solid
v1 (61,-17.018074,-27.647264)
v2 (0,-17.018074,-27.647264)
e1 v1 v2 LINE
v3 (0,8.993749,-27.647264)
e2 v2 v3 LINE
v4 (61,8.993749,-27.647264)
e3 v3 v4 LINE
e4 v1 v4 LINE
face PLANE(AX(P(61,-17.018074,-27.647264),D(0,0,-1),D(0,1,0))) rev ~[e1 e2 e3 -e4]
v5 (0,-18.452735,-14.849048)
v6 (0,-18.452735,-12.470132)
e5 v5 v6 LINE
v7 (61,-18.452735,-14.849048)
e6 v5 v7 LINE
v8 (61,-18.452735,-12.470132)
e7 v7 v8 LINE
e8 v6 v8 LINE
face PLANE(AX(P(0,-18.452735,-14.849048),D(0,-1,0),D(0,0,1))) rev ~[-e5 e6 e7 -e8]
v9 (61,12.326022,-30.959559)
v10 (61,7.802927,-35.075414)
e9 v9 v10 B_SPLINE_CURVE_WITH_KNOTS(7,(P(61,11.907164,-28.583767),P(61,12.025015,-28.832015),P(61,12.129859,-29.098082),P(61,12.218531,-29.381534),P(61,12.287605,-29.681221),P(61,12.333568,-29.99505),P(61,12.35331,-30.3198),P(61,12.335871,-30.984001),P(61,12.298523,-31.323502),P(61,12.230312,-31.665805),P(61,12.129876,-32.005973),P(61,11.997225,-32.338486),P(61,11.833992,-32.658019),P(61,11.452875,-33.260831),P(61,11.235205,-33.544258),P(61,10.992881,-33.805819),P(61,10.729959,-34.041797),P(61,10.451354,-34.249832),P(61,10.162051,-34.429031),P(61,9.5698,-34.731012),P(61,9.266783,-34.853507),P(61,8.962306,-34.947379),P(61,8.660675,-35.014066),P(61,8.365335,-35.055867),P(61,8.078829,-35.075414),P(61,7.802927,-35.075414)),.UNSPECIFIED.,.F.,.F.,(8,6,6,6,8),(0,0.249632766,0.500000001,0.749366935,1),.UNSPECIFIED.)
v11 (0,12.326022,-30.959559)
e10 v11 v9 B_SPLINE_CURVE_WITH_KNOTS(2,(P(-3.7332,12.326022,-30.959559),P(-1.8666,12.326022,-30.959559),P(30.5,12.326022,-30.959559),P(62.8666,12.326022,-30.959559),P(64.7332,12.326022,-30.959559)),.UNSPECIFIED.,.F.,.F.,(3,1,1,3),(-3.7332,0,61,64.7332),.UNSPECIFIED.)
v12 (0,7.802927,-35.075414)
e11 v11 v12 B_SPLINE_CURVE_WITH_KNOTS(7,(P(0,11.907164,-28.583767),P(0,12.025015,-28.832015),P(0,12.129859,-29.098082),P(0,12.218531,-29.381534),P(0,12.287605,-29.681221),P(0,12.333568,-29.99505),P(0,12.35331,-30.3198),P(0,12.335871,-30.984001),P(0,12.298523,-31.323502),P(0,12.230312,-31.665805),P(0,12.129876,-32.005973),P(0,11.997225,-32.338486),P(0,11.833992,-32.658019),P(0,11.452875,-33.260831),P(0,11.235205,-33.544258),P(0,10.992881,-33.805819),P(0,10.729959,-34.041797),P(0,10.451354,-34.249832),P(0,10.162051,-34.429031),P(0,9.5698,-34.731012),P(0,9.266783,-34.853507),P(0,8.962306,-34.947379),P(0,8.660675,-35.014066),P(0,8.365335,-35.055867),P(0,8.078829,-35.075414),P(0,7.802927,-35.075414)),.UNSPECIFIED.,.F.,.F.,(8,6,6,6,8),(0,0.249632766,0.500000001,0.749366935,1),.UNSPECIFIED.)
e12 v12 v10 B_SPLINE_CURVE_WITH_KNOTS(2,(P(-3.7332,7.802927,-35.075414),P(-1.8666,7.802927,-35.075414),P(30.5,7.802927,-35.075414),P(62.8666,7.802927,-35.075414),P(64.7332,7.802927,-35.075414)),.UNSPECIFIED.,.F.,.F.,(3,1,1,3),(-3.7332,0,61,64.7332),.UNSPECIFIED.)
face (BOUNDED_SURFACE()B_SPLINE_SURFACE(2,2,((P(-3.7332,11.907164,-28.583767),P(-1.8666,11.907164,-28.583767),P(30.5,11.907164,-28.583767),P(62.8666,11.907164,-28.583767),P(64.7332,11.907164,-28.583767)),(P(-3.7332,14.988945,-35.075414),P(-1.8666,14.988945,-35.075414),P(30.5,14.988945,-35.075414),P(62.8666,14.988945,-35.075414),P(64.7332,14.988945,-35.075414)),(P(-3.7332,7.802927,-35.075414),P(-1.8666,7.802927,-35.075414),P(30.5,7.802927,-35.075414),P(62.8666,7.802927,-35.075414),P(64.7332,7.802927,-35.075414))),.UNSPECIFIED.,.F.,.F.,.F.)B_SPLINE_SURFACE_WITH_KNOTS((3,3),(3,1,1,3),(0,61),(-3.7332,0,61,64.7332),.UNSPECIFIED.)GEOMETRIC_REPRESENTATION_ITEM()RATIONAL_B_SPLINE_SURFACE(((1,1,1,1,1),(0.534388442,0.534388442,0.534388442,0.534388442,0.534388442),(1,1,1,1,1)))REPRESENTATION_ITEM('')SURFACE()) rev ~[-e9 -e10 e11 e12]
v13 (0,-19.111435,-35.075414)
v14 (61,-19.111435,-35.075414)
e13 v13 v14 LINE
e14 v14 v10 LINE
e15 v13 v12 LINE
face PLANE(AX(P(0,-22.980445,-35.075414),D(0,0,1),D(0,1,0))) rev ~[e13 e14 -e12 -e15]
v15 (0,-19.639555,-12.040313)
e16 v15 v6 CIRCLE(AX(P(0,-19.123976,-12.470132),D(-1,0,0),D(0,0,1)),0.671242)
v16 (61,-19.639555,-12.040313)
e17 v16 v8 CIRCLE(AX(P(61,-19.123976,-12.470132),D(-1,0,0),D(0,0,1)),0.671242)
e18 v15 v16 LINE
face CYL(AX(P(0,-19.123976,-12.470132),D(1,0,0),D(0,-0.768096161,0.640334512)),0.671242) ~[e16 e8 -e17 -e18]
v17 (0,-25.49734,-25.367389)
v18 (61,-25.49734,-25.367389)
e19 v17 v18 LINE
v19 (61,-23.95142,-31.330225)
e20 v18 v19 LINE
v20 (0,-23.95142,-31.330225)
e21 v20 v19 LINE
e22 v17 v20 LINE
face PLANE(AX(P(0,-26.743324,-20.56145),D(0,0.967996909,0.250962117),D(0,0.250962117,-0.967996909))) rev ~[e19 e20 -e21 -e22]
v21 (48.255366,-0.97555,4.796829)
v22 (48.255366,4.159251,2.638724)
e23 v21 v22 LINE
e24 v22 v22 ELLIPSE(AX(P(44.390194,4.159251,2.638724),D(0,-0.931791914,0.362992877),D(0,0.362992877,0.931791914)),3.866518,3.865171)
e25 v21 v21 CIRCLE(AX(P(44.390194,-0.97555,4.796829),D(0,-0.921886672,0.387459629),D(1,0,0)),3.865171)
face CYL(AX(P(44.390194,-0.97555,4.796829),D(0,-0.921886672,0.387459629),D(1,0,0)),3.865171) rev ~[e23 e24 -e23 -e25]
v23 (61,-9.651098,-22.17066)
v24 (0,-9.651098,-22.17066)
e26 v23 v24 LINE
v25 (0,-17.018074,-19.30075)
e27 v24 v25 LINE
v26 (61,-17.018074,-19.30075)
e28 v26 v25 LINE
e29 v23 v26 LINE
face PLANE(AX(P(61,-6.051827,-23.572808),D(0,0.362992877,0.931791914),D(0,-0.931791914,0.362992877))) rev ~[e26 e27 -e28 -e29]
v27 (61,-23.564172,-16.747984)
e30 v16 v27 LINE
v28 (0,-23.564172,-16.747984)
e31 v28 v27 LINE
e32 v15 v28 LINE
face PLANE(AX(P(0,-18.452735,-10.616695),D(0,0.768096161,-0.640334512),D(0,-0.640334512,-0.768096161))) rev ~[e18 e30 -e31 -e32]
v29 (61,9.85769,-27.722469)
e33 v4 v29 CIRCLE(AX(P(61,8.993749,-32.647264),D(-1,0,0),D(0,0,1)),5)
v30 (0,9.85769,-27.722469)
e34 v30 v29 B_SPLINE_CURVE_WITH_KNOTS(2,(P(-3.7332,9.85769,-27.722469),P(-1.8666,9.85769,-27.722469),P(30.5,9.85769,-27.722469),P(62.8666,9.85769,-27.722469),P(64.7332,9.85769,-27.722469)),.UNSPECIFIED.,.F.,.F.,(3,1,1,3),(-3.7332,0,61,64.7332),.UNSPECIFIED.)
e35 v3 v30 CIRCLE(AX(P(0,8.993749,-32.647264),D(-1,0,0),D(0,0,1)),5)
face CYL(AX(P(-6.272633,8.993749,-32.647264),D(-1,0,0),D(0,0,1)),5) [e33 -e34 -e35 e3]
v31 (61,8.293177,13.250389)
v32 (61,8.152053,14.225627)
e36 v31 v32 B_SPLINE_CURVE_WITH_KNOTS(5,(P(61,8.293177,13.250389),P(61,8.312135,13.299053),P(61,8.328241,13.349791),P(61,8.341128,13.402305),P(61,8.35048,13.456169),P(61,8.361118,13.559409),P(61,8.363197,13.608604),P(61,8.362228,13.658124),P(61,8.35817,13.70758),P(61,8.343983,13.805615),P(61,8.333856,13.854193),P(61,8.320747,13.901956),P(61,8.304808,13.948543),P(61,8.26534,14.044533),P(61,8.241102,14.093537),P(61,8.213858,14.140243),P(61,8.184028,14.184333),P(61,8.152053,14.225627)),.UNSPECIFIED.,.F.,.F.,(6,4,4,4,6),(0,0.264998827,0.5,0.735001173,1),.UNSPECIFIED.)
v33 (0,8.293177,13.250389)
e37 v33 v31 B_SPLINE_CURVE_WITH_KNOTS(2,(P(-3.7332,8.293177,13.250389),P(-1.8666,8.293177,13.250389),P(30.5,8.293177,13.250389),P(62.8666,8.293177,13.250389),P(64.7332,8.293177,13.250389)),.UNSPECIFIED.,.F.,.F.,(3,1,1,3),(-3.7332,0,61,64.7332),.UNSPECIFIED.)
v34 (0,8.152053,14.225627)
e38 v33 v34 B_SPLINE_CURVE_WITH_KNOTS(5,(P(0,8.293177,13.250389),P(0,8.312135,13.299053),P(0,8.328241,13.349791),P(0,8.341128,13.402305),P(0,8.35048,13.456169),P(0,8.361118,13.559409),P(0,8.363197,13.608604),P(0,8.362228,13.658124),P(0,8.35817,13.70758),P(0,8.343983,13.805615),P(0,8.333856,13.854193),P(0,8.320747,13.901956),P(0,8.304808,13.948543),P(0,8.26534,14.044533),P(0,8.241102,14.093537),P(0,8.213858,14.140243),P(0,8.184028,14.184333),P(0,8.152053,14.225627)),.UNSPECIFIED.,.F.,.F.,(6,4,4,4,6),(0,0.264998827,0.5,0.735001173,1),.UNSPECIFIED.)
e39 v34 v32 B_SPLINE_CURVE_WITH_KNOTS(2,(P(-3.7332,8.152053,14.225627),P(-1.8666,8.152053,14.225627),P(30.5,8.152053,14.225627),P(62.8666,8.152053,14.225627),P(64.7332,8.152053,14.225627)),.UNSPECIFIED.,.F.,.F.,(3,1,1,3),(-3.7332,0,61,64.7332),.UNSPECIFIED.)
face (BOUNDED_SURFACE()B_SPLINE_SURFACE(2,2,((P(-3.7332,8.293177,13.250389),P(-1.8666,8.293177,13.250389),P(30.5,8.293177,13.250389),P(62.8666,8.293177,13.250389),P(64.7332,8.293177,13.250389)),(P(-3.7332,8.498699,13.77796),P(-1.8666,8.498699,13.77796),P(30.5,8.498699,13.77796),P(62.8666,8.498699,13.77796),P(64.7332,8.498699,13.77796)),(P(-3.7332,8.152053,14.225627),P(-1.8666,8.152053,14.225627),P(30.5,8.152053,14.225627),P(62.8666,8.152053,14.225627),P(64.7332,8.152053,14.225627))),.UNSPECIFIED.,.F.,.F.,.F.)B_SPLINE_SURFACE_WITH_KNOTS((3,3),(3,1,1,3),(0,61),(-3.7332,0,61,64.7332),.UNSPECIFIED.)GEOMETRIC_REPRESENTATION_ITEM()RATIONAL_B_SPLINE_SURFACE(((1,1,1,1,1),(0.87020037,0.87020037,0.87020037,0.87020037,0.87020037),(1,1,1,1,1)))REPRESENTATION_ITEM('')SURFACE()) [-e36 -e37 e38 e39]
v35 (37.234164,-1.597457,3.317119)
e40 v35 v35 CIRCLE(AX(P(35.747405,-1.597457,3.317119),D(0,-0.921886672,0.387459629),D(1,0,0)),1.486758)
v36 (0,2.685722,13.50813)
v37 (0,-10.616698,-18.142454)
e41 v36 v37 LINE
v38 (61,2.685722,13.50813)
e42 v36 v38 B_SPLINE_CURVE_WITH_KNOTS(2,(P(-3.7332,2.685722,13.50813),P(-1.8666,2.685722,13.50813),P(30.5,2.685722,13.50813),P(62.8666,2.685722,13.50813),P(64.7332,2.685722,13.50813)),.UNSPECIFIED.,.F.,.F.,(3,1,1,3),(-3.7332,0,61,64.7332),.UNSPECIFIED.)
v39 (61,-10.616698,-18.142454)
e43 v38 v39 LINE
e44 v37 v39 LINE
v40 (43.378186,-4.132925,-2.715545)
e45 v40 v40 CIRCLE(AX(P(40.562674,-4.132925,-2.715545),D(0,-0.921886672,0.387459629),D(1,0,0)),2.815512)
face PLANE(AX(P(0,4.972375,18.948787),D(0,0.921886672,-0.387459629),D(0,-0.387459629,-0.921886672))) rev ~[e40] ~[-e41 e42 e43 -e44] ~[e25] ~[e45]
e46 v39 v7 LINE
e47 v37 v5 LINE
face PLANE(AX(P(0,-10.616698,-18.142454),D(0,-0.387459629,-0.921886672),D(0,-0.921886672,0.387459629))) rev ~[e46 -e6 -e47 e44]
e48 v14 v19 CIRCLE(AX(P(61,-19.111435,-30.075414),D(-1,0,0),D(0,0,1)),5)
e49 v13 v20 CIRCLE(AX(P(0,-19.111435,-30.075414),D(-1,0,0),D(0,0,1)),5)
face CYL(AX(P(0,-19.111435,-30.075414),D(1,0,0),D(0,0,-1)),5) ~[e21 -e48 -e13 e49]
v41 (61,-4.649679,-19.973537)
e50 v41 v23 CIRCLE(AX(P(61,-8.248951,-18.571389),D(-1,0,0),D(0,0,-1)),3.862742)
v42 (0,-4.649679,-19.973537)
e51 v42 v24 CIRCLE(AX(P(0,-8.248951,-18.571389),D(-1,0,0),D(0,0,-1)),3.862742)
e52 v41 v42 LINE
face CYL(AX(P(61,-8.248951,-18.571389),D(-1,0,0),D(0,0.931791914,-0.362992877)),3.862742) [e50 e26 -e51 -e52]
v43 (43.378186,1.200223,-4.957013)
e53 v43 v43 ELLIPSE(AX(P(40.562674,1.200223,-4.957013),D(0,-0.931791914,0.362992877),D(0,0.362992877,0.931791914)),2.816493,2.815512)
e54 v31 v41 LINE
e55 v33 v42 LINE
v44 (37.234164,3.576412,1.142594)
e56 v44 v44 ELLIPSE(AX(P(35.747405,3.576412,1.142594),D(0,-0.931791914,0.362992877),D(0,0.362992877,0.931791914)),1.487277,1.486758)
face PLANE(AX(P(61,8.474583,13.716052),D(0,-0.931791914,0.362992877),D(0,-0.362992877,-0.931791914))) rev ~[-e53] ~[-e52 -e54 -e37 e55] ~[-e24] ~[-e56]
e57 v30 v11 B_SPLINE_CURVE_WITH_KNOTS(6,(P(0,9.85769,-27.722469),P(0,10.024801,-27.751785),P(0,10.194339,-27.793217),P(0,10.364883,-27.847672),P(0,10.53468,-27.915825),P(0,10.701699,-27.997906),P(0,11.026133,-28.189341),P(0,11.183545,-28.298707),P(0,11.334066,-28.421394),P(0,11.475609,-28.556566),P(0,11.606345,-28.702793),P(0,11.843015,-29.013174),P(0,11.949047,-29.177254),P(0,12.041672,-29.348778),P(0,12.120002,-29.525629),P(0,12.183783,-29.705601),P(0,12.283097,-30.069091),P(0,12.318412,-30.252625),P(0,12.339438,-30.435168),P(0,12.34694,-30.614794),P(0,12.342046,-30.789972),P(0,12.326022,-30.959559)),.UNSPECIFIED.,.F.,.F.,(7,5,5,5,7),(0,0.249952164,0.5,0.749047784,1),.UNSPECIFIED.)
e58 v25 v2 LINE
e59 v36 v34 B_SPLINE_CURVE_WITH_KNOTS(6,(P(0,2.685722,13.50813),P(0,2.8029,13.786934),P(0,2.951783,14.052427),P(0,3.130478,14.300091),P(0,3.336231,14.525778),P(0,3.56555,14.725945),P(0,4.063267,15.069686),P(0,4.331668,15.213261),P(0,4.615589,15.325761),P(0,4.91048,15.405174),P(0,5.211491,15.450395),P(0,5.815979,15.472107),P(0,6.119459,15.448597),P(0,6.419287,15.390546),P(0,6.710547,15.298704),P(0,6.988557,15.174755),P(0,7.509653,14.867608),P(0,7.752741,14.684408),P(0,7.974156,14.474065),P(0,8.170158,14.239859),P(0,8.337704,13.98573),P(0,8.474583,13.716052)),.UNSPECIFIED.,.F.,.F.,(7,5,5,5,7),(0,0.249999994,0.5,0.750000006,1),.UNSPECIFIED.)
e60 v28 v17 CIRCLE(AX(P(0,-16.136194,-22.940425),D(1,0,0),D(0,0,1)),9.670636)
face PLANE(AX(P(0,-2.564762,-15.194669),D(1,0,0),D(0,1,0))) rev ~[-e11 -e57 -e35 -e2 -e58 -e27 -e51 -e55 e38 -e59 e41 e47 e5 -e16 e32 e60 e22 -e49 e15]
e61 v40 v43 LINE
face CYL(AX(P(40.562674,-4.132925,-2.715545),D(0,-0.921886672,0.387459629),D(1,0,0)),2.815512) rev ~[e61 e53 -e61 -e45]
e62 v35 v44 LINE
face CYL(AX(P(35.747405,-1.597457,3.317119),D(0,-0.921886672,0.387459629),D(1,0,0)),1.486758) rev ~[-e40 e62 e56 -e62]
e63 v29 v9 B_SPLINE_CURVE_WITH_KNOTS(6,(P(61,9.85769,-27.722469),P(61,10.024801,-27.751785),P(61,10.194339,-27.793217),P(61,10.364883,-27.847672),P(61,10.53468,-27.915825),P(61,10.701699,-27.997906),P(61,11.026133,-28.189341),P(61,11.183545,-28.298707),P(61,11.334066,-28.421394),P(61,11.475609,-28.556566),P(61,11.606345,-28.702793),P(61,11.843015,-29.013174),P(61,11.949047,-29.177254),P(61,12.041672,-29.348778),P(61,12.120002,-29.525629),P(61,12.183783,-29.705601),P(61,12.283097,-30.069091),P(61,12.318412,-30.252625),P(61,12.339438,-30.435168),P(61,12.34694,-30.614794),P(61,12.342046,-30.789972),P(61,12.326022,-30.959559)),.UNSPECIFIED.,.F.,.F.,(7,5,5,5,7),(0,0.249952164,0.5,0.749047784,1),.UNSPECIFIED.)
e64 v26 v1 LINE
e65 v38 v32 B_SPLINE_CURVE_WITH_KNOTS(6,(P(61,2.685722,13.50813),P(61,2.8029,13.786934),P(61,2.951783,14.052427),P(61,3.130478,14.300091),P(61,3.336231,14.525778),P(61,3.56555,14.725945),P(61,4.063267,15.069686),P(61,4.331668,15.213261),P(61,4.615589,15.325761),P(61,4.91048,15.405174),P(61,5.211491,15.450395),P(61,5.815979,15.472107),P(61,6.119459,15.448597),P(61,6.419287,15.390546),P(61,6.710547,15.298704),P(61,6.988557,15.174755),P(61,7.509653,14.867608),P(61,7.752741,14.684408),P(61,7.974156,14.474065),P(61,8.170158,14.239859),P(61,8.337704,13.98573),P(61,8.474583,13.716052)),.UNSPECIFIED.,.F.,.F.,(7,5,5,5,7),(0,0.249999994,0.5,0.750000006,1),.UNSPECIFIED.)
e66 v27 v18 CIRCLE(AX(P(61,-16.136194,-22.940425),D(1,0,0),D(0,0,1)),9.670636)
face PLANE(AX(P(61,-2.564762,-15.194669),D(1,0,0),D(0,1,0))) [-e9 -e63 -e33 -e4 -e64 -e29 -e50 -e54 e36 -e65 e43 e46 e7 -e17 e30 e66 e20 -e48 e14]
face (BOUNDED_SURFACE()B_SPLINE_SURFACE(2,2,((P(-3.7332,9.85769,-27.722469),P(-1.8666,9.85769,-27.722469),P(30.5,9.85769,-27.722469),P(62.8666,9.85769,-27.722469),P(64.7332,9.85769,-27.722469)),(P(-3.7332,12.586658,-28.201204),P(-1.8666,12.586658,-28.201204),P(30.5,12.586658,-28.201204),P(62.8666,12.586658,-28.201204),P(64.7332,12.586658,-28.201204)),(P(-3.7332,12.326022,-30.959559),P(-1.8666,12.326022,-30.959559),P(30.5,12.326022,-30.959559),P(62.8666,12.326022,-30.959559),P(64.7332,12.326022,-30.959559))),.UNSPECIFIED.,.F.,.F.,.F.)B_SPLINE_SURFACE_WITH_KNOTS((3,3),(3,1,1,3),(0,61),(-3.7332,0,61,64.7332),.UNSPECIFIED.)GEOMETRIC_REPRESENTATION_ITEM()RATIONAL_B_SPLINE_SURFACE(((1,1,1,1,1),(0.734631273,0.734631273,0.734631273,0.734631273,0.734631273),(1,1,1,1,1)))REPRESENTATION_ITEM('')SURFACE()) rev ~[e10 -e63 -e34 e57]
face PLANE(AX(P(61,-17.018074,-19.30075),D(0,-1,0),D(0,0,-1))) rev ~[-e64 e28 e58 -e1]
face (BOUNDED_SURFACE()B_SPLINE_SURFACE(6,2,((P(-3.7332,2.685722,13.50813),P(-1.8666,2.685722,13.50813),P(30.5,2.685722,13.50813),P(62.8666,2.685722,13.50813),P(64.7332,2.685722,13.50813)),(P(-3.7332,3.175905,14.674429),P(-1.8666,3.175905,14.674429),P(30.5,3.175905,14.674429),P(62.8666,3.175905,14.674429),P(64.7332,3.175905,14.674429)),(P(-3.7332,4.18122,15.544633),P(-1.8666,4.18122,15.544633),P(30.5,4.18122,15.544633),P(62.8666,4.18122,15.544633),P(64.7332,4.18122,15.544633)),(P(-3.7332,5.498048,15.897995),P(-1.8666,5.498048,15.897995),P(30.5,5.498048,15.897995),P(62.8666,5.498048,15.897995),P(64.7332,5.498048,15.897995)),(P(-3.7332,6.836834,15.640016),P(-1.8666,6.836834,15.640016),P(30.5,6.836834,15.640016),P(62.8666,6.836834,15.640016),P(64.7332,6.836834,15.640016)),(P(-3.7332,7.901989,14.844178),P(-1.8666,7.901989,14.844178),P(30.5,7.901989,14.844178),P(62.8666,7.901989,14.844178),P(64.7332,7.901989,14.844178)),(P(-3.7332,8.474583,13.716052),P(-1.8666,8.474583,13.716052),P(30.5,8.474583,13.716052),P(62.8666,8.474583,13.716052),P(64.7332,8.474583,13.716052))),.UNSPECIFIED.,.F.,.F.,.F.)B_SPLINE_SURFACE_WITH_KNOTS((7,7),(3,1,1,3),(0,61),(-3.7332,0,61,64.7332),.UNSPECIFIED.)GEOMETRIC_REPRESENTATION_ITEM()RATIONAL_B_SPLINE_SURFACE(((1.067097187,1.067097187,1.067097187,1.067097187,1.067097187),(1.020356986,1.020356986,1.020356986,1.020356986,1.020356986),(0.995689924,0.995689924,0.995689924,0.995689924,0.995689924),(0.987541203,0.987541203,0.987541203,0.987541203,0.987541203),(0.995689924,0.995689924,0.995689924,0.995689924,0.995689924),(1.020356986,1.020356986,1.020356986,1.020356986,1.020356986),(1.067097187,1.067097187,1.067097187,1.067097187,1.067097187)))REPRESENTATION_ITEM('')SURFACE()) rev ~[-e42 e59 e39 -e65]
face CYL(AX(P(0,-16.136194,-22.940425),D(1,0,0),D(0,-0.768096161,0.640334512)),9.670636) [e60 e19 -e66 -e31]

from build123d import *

# Parameters (mm, degrees)
F1_DEPTH     = 61
F2_R         = 9.670635699
F3_R         = 0.6712415125
F4_R         = 3.1919162273
F5_R         = 4.5432418233
F6_R         = 5
F7_R         = 3.8651714317
F7_R_2       = 1.4867583823
F7_R_3       = 2.8155117611
F8_DEPTH     = 25
F10_DEPTH    = 75.5
F11_R        = 3.8627416998
F12_T1_DEPTH = 73.5452662192
F13_R        = 3
F14_R        = 1


# Not quite as in the source:
# - a fillet or chamfer that OpenCascade refuses, or shapes differently, is made with other operations: its cross-section is extruded or revolved along the edge and cut away or added


with BuildPart() as f1:
    # F0 (on Right) → F1 (new body)
    with BuildSketch(Plane.YZ):
        with BuildLine():
            add(Edge.make_bspline(
                [(18.1424543803, -35.0754142348), (0, -24.5931053673), (21.0989990325, 0), (4.9723746061, 18.9487867674)],
                knots=[0, 0, 0, 0, 55.6063422209, 55.6063422209, 55.6063422209, 55.6063422209], degree=3))
            Line((4.9723746061, 18.9487867674), (-10.6166982745, -18.1424543803))
            Line((-10.6166982745, -18.1424543803), (-18.4527349874, -14.8490475373))
            Line((-18.4527349874, -14.8490475373), (-18.4527349874, -10.6166952334))
            Line((-18.4527349874, -10.6166952334), (-26.7433237145, -20.5614495141))
            Line((-26.7433237145, -20.5614495141), (-22.9804446479, -35.0754142348))
            Line((-22.9804446479, -35.0754142348), (18.1424543803, -35.0754142348))
        make_face()
    extrude(amount=F1_DEPTH)

    # F2
    f2_edges = [f1.edges().sort_by_distance(p)[0] for p in [
        (30.5, -26.743324, -20.56145),
    ]]
    fillet(f2_edges, radius=F2_R)

    # F3
    f3_edges = [f1.edges().sort_by_distance(p)[0] for p in [
        (30.5, -18.452735, -10.616695),
    ]]
    fillet(f3_edges, radius=F3_R)

    # F4
    f4_edges = [f1.edges().sort_by_distance(p)[0] for p in [
        (30.5, 4.972375, 18.948787),
    ]]
    fillet(f4_edges, radius=F4_R)

    # F5
    f5_edges = [f1.edges().sort_by_distance(p)[0] for p in [
        (30.5, 18.142454, -35.075414),
    ]]
    fillet(f5_edges, radius=F5_R)

    # F6
    f6_edges = [f1.edges().sort_by_distance(p)[0] for p in [
        (30.5, -22.980445, -35.075414),
    ]]
    fillet(f6_edges, radius=F6_R)

    # F7 (on face) → F8 (cut)
    with BuildSketch(Plane(origin=(0, -2.542493383, 1.0685842107), x_dir=(1, 0, 0), z_dir=(0, -0.9218866721, 0.3874596286))):
        with Locations((44.390194118, 4.044146277)):
            Circle(F7_R)
        with Locations((35.7474051416, 2.4390574545)):
            Circle(F7_R_2)
        with Locations((40.5626744032, -4.1047660634)):
            Circle(F7_R_3)
    extrude(amount=-F8_DEPTH, mode=Mode.SUBTRACT)

    # F9 (on face) → F10 (cut)
    with BuildSketch(Plane.YZ.offset(61)):
        Polygon((17.7633237159, 10.0974902644), (8.4745825412, 13.7160523356), (-6.0518267564, -23.5728081316), (-17.0180739519, -19.3007495805), (-17.0180739519, -27.6472643018), (21.4816201478, -27.6472643018), align=None)
    extrude(amount=-F10_DEPTH, mode=Mode.SUBTRACT)

    # F11
    f11_edges = [f1.edges().sort_by_distance(p)[0] for p in [
        (30.5, -6.051827, -23.572808),
    ]]
    fillet(f11_edges, radius=F11_R)

    # F12: fillet of radius 5 on 1 edges, made by hand

    # F12_s2 → F12_t1 (cut)
    with BuildSketch(Plane.YZ.offset(-6.2726331096)):
        with BuildLine():
            ThreePointArc((8.9937485165, -27.6472643018), (10.5238649897, -27.8871441795), (11.9071638019, -28.5837668704))
            Line((11.9071638019, -28.5837668704), (11.9654321077, -28.5024969218))
            ThreePointArc((11.9654321077, -28.5024969218), (11.7885278554, -28.0794589932), (11.5959390896, -27.6108577379))
            Line((11.5959390896, -27.6108577379), (11.5028017603, -27.5472643018))
            Line((11.5028017603, -27.5472643018), (8.9937485165, -27.5472643018))
            Line((8.9937485165, -27.5472643018), (8.9937485165, -27.6472643018))
        make_face()
    extrude(amount=F12_T1_DEPTH, mode=Mode.SUBTRACT)

    # F13
    f13_edges = [f1.edges().sort_by_distance(p)[0] for p in [
        (30.5, 11.907164, -28.583767),
    ]]
    fillet(f13_edges, radius=F13_R)

    # F14
    f14_edges = [f1.edges().sort_by_distance(p)[0] for p in [
        (30.5, 8.474583, 13.716052),
    ]]
    fillet(f14_edges, radius=F14_R)


solid = f1.part
